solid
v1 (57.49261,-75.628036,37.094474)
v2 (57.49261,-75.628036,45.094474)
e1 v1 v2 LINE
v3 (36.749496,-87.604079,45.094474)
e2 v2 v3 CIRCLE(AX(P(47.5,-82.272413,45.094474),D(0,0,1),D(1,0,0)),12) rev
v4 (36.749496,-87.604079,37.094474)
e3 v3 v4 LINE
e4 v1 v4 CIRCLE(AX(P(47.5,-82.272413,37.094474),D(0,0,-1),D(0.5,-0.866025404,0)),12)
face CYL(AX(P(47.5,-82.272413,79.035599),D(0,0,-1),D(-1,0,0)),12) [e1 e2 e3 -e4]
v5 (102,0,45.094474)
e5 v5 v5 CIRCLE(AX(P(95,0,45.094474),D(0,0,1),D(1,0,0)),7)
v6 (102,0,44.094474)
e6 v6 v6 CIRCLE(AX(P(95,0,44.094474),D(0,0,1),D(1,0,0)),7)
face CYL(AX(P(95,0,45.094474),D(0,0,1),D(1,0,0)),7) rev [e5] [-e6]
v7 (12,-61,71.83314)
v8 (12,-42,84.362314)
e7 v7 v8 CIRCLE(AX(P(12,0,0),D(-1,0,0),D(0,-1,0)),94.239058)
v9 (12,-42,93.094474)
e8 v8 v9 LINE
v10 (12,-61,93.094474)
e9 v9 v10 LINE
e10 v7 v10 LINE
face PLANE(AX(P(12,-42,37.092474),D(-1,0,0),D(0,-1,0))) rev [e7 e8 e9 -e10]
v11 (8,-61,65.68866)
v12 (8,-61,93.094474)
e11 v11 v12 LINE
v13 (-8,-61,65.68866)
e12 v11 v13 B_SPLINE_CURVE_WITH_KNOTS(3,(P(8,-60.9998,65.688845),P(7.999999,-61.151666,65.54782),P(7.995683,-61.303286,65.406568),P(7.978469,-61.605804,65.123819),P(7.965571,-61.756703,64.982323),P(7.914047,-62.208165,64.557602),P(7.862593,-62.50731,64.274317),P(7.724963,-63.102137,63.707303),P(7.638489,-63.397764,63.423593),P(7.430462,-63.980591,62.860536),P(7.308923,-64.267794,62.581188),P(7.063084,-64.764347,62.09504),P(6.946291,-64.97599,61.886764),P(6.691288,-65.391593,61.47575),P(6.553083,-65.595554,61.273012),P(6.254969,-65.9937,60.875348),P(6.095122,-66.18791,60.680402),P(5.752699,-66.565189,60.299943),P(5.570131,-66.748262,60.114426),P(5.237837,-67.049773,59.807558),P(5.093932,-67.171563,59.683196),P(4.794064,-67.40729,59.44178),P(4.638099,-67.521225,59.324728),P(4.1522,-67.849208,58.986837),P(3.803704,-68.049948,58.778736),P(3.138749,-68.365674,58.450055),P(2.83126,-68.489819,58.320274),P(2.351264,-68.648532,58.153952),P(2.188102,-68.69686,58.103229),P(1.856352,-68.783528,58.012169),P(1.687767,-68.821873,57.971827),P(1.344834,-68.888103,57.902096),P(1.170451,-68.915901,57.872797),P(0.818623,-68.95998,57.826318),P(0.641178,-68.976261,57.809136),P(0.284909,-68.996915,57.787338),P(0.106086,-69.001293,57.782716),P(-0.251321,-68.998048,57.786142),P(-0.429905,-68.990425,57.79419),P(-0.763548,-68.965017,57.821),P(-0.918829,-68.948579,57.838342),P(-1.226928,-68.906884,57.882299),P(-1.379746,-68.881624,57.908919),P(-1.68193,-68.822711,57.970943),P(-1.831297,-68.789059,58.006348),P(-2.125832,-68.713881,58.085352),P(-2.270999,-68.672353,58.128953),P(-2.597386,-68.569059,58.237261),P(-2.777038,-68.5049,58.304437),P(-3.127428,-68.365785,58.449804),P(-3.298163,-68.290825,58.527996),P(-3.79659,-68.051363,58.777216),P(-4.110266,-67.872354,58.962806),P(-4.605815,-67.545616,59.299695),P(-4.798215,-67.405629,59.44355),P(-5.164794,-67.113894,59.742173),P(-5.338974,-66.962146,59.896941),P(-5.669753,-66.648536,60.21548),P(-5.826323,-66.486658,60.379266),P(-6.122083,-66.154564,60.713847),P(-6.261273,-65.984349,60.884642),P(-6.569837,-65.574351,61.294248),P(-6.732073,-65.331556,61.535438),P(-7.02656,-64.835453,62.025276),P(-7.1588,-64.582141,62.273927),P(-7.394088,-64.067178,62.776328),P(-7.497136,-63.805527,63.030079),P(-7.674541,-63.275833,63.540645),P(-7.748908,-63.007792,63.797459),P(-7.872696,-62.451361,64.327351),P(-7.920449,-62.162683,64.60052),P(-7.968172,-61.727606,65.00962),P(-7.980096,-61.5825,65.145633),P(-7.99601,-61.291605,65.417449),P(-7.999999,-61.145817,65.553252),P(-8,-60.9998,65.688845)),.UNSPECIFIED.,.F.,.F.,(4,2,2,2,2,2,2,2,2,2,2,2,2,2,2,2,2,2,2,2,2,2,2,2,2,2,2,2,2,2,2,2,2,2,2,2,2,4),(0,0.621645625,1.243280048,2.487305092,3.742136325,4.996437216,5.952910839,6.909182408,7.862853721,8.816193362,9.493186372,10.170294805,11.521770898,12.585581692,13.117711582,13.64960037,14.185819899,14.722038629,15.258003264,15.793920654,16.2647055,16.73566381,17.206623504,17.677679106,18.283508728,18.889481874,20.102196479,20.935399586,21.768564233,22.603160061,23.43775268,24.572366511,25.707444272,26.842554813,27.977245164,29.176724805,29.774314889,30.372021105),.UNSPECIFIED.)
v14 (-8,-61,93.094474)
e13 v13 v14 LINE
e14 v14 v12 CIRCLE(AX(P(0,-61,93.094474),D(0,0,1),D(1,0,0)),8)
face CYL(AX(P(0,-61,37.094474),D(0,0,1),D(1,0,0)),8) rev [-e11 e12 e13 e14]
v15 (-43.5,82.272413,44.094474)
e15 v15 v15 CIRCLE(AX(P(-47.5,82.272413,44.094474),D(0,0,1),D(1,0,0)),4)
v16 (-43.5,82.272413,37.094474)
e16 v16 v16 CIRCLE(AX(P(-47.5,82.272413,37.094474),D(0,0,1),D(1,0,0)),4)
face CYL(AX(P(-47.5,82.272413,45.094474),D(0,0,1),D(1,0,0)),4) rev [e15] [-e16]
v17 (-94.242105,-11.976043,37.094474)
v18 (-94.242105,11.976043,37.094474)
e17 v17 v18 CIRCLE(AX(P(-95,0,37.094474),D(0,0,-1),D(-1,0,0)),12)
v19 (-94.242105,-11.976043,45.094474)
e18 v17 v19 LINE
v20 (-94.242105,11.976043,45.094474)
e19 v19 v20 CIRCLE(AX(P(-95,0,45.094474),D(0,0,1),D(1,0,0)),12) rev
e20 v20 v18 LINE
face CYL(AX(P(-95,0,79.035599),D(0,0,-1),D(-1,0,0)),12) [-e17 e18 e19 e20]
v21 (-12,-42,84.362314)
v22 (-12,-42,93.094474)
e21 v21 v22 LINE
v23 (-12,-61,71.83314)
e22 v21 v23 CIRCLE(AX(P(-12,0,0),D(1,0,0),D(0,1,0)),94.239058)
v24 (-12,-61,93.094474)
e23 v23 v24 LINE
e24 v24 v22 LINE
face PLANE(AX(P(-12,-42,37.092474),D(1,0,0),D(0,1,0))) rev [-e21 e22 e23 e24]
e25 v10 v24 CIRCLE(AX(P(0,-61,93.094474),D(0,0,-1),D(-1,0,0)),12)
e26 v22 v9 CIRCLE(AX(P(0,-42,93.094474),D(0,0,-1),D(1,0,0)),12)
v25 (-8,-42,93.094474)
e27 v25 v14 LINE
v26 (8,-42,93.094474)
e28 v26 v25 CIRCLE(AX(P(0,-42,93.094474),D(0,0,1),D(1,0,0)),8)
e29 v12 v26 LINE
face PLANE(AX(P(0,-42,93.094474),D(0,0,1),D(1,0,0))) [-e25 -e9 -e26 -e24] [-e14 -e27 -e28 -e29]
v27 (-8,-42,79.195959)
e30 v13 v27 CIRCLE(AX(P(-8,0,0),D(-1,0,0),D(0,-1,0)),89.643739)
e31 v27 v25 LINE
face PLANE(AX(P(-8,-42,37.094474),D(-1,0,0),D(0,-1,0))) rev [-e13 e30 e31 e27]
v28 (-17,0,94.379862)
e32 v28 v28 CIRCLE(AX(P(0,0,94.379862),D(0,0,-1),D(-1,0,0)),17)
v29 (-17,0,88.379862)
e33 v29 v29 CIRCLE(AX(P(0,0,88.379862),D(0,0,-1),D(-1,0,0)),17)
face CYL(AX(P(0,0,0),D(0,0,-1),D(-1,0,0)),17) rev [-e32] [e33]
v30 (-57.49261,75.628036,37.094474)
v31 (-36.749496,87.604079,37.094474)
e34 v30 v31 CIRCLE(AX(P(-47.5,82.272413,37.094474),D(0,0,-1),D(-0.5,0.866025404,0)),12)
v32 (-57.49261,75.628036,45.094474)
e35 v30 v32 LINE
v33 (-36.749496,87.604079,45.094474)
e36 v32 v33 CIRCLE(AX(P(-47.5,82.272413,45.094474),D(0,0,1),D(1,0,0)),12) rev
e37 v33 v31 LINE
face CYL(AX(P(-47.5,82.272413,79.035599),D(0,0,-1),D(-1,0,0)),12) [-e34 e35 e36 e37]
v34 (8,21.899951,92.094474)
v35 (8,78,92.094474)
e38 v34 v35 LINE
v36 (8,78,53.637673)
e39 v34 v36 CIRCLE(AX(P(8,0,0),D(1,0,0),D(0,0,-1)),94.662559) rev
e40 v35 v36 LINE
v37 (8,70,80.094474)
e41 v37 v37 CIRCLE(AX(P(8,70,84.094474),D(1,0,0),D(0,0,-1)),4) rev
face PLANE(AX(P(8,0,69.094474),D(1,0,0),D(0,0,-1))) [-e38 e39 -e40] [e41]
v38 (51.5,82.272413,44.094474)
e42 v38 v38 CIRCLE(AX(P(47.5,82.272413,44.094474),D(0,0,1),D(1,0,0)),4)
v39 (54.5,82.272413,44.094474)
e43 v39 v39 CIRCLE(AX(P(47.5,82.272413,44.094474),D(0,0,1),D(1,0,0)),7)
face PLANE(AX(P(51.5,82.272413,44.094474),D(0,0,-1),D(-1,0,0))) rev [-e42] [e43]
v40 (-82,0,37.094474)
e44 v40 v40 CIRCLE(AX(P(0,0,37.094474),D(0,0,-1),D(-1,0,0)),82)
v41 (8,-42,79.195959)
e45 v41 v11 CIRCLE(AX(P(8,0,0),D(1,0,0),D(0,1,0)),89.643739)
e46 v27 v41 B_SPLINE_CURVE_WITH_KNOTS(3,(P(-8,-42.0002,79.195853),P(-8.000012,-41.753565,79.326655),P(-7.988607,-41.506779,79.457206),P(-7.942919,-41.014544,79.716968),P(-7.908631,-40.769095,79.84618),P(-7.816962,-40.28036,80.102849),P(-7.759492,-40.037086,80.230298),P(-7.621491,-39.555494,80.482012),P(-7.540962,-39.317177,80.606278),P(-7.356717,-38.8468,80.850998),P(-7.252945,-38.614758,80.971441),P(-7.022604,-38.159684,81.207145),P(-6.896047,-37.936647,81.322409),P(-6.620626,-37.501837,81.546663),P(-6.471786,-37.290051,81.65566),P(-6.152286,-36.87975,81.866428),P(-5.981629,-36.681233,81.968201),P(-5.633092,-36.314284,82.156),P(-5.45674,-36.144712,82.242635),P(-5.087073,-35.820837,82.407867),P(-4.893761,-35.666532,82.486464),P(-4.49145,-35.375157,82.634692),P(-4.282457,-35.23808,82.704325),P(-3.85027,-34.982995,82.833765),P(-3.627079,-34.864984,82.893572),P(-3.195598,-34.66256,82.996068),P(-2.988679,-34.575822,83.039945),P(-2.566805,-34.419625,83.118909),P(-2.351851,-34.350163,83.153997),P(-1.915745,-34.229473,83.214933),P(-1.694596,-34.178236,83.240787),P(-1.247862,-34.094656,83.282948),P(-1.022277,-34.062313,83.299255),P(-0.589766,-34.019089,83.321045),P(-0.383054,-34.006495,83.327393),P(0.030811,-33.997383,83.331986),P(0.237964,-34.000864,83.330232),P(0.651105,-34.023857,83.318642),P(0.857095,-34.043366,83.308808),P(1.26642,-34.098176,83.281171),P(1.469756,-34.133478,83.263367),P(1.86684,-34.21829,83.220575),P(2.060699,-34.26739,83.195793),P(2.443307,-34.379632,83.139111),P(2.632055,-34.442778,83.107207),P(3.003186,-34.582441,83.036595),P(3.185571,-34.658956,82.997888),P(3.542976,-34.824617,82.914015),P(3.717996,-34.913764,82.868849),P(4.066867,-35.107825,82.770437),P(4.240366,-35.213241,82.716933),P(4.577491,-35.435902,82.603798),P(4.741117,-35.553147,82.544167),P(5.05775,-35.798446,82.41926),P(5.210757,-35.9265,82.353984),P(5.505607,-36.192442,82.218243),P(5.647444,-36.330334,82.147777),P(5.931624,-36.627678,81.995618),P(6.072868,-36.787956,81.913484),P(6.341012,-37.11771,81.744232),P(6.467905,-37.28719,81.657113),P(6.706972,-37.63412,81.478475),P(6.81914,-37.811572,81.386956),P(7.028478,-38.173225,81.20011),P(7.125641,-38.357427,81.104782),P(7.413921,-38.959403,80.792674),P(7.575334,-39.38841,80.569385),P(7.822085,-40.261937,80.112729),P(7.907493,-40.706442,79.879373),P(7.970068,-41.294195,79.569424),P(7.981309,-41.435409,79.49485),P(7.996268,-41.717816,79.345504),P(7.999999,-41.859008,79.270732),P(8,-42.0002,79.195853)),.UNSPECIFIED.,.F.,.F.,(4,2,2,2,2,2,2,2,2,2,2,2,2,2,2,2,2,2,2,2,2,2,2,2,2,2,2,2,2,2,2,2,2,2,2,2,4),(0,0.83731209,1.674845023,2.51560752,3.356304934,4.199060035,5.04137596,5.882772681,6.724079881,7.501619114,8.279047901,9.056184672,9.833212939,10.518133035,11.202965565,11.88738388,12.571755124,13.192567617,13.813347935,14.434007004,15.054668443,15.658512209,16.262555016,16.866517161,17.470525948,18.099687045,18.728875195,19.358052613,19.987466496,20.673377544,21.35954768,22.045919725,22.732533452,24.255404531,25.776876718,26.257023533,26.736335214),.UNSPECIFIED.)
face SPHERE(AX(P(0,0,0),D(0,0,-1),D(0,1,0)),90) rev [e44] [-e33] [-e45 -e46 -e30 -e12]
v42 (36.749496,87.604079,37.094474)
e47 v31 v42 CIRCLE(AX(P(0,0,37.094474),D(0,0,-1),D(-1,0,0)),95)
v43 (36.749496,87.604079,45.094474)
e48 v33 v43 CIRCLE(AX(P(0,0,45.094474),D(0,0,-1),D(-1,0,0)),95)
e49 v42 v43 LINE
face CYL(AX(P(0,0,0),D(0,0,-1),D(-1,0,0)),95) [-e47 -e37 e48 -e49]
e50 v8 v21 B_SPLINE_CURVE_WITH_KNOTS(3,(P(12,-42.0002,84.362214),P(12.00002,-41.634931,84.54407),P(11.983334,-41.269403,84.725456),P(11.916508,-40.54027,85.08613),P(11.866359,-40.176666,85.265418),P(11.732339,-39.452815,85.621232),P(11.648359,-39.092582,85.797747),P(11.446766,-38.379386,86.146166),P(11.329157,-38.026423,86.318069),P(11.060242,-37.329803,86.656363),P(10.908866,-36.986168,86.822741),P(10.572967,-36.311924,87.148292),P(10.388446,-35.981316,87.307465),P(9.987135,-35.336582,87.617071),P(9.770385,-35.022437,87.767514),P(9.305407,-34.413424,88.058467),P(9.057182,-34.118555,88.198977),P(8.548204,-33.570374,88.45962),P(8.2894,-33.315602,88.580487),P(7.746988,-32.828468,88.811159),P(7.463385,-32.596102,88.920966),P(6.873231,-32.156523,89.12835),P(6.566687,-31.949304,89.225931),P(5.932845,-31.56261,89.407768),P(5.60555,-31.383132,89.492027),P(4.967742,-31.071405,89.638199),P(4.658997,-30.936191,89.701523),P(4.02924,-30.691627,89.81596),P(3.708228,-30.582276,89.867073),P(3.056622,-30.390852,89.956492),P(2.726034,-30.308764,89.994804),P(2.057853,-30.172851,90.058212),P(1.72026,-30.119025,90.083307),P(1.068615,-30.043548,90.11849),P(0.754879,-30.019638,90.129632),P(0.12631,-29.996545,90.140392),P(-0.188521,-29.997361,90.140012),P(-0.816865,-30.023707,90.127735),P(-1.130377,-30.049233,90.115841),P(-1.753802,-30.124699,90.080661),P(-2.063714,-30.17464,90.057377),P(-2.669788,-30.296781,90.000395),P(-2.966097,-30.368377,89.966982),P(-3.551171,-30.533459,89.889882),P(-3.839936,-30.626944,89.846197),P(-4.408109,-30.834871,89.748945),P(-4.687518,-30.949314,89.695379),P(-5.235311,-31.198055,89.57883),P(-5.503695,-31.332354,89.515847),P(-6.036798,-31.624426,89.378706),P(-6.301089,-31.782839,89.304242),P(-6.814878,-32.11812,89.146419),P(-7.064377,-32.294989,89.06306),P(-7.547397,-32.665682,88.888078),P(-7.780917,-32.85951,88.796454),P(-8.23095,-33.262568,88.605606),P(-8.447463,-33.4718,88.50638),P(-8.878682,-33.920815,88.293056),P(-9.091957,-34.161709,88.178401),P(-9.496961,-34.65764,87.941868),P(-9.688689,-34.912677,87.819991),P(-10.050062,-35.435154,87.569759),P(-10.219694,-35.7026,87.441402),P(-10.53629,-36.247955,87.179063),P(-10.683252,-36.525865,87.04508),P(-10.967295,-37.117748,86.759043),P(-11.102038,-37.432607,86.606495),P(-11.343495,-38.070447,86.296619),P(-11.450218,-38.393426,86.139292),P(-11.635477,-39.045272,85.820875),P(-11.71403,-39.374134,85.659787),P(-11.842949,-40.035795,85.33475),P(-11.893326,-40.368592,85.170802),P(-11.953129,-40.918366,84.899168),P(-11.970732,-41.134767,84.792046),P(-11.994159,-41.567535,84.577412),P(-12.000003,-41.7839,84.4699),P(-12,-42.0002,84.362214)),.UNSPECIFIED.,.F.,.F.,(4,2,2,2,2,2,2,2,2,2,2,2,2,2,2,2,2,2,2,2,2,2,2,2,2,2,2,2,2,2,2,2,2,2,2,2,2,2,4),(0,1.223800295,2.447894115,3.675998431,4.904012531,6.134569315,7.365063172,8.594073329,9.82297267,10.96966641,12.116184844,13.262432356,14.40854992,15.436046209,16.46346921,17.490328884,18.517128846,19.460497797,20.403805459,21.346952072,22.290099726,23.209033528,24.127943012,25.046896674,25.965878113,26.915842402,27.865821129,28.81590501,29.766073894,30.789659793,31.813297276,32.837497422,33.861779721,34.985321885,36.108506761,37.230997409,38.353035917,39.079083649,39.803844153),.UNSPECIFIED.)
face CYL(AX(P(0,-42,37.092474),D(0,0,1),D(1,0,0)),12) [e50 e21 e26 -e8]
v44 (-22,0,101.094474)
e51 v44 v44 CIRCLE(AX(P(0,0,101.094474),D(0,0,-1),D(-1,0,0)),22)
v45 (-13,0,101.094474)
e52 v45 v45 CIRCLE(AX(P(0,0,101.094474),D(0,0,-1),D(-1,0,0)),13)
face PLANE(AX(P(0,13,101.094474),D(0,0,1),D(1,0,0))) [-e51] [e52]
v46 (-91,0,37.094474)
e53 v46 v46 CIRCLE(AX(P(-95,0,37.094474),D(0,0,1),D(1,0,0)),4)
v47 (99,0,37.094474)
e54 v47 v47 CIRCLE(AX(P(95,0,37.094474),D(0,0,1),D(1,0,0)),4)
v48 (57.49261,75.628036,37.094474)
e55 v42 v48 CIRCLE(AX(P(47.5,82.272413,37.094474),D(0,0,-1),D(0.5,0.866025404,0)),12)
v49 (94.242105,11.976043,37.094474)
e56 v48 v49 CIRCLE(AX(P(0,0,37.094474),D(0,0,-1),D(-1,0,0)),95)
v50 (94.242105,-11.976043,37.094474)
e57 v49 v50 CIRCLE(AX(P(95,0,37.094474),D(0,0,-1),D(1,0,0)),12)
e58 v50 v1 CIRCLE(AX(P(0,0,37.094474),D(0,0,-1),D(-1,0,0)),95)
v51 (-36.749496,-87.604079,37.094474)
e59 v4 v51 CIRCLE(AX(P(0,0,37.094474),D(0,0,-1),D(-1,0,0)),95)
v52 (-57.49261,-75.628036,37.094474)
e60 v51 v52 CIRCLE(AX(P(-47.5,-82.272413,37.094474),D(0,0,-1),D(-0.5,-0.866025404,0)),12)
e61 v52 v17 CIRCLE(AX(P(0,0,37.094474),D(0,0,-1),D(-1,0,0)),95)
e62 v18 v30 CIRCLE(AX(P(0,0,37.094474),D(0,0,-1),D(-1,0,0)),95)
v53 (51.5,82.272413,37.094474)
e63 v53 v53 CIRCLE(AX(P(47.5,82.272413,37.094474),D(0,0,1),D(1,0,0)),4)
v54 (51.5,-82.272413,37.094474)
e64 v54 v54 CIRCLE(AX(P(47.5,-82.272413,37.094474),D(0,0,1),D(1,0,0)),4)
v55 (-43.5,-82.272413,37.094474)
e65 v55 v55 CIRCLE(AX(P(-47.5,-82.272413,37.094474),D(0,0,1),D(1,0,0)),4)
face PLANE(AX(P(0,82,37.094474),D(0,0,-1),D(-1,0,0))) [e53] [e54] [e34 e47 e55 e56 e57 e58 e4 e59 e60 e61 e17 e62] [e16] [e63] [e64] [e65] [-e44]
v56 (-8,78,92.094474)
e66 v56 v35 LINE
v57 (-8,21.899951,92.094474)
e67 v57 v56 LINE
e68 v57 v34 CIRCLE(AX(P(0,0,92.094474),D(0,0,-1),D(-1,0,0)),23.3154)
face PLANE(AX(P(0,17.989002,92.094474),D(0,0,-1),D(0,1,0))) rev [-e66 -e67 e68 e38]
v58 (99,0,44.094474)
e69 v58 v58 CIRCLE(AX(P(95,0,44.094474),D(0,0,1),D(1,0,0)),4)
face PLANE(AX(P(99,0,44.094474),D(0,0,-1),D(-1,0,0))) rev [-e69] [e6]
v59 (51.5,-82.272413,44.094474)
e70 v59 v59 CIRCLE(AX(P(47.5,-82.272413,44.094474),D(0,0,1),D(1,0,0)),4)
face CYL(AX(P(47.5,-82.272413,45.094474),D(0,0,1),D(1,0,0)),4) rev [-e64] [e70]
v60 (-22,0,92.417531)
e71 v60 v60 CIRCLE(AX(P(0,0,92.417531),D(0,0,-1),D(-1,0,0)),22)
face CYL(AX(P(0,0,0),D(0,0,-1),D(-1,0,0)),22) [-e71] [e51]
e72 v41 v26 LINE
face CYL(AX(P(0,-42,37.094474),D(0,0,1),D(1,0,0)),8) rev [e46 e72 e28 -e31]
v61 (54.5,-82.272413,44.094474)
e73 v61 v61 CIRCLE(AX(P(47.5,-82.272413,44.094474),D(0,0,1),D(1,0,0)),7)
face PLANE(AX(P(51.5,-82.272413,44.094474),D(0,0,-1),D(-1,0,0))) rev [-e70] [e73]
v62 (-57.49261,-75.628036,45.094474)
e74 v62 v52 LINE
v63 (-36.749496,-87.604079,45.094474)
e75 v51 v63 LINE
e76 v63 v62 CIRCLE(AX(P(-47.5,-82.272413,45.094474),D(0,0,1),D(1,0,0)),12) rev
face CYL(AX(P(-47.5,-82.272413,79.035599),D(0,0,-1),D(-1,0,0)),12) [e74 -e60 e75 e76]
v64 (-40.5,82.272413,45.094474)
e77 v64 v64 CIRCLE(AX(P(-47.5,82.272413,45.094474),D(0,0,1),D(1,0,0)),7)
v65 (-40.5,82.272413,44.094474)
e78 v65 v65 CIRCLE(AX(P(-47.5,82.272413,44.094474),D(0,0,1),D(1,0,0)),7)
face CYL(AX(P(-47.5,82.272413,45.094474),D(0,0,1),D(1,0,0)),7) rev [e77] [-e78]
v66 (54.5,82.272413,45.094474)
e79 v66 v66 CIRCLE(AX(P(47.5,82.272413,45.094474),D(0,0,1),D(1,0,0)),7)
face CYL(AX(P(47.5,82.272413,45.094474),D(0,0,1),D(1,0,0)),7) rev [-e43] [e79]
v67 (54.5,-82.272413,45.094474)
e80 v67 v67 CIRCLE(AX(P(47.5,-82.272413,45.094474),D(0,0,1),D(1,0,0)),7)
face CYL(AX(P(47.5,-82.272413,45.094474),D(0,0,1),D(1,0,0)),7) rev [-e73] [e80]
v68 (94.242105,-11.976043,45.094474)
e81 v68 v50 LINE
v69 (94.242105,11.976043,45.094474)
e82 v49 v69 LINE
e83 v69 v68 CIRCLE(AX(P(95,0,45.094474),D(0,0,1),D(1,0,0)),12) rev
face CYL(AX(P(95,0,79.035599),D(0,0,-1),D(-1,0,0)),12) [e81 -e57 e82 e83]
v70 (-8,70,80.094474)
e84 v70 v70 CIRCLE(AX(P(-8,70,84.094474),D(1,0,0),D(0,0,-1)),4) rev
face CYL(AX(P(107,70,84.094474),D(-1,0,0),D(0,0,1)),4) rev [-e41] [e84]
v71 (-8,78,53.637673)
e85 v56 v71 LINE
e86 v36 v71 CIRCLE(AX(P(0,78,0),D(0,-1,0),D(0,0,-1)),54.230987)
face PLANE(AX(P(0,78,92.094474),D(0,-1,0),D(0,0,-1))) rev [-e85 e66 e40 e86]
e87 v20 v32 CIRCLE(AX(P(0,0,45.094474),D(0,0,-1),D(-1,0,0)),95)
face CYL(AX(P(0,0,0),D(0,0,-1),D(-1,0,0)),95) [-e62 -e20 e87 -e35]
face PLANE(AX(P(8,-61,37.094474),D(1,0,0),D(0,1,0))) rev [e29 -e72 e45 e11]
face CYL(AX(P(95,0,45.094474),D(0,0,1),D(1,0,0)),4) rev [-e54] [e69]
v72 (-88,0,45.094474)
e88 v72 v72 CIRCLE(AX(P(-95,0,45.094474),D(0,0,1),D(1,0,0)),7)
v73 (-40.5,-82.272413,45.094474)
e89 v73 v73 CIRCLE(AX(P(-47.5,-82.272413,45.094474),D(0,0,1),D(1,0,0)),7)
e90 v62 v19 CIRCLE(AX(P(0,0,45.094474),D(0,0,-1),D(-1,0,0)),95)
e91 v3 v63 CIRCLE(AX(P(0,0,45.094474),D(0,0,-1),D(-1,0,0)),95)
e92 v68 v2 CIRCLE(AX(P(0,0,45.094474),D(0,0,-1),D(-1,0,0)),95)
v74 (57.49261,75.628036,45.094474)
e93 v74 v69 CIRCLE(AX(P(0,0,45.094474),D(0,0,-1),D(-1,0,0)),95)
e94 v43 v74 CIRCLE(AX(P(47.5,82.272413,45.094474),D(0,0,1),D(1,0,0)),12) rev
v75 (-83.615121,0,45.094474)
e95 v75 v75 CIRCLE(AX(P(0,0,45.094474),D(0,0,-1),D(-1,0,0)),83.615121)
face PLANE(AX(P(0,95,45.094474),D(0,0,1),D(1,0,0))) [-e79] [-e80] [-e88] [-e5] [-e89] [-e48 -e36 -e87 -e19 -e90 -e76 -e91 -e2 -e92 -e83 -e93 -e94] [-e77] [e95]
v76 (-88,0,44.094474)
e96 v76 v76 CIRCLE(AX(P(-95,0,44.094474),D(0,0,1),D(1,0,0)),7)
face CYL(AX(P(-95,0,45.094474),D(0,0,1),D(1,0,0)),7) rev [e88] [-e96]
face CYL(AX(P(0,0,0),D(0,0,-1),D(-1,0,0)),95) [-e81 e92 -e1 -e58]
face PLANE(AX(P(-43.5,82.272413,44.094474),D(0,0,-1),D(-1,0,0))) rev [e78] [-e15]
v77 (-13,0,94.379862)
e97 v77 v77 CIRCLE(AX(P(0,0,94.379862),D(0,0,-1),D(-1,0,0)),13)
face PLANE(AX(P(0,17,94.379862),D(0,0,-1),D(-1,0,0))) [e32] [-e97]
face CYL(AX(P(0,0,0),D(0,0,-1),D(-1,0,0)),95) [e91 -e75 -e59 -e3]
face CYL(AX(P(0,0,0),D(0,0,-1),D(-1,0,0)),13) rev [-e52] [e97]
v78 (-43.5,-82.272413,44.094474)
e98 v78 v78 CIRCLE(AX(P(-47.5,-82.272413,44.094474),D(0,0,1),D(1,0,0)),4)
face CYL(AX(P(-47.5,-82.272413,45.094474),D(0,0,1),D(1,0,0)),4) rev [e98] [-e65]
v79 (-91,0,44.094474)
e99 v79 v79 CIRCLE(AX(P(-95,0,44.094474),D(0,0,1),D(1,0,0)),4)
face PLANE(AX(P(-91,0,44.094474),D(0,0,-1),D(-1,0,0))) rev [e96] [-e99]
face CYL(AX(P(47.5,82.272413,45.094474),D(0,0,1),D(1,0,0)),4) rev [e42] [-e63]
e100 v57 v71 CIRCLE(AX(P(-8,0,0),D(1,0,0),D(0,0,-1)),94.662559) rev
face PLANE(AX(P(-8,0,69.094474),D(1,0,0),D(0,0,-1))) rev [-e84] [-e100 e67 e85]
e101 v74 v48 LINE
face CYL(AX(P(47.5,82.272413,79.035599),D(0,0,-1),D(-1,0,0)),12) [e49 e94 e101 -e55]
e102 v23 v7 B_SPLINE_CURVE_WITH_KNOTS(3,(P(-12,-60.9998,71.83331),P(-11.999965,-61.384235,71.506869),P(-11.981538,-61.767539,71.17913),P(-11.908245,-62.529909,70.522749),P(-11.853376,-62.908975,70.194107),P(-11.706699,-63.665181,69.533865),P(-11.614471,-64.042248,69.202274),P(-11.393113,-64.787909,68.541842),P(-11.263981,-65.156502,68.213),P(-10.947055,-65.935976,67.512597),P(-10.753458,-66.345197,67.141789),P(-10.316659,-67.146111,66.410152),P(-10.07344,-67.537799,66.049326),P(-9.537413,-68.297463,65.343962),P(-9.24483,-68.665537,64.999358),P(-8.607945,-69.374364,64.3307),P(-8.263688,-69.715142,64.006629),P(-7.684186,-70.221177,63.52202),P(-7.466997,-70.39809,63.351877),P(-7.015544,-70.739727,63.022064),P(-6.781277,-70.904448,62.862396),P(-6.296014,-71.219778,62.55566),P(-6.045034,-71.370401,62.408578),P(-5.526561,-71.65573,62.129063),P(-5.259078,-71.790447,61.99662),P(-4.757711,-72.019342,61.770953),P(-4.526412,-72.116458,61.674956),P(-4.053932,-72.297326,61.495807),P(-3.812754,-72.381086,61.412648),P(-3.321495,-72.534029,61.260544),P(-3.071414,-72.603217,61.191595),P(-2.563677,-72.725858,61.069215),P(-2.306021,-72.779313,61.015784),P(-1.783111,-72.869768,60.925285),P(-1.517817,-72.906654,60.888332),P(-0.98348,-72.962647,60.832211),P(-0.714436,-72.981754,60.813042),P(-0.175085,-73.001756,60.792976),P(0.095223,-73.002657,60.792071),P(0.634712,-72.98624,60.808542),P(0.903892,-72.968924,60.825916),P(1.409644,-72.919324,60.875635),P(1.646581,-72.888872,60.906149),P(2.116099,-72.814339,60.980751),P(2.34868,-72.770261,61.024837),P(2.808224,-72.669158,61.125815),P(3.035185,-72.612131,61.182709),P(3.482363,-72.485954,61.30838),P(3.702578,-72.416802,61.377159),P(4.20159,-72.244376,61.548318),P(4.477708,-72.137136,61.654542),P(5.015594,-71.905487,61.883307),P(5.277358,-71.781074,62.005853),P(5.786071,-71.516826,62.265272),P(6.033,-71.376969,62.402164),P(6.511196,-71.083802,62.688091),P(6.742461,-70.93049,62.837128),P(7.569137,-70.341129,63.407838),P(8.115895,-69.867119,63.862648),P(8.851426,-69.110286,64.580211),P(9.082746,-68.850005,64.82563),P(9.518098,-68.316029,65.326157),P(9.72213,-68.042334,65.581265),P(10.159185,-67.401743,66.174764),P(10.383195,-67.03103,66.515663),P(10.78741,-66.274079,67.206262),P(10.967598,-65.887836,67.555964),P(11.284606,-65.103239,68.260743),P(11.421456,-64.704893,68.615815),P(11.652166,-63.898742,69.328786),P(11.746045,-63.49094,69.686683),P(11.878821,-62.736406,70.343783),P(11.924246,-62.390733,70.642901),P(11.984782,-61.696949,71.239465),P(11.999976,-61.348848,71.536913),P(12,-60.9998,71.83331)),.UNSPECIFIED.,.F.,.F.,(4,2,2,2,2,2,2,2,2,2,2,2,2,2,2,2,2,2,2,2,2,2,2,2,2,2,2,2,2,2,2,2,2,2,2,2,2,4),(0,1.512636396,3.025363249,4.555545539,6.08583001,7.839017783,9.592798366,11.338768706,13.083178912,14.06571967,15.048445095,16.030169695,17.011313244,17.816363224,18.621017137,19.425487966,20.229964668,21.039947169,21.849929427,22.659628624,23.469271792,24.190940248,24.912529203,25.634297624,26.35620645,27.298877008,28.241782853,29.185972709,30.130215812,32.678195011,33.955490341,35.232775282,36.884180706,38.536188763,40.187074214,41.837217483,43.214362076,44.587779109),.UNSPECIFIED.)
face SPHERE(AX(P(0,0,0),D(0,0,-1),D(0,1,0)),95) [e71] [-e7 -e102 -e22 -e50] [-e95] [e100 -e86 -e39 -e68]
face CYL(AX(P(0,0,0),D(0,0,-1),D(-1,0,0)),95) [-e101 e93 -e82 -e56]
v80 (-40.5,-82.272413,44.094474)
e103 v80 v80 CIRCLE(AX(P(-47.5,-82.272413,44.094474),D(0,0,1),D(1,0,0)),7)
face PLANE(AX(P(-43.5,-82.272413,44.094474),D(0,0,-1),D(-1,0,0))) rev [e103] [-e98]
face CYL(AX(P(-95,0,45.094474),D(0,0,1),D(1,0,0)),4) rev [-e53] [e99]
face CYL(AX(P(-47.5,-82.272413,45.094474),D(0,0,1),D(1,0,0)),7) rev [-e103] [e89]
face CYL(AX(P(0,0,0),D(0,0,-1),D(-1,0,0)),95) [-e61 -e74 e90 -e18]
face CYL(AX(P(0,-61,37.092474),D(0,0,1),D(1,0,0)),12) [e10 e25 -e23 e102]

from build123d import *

# Parameters (mm, degrees)
SKETCH_2_R                   = 12
EXTRUDE_1_DEPTH              = 8
HOLE_WIZARD_M8_3_D           = 8
HOLE_WIZARD_M8_3_CBORE_D     = 14
HOLE_WIZARD_M8_3_CBORE_DEPTH = 1
PATTERN_CIRCULAR_1_COUNT     = 6
EXTRUDE_2_REACH              = 155.655
EXTRUDE_2_END_RADIUS         = 95
CUT_EXTRUDE_1_DEPTH          = 154.655458738
RIB_START                    = -8
RIB_1_DEPTH                  = 16
CUT_EXTRUDE_3_DEPTH          = 176.197296411
CUT_EXTRUDE_3_DEPTH_BACK     = 176.197296411
SKETCH_14_R                  = 4


with BuildPart() as part:
    # 草图1 → 旋转1 (revolve)
    with BuildSketch(Plane(origin=(0, 0, 0), x_dir=(0, 0, -1), z_dir=(1, 0, 0)), mode=Mode.PRIVATE) as revolve_1_sk:
        with BuildLine():
            Line((-88.37986196, 17), (-94.37986196, 17))
            Line((-94.37986196, 17), (-94.37986196, 13))
            Line((-94.37986196, 13), (-101.094473982, 13))
            Line((-101.094473982, 13), (-101.094473982, 22))
            Line((-101.094473982, 22), (-92.417530804, 22))
            ThreePointArc((-92.417530804, 22), (-75.342508858, 57.866279982), (-45.094473982, 83.61512074))
            Line((-45.094473982, 83.61512074), (-45.094473982, 95))
            Line((-45.094473982, 95), (-37.094473982, 95))
            Line((-37.094473982, 95), (-37.094473982, 82))
            ThreePointArc((-37.094473982, 82), (-70.65551815, 55.747625555), (-88.37986196, 17))
        make_face()
    revolve(revolve_1_sk.sketch.rotate(Axis((0, 0, 0), (0, 0, 1)), 90), axis=Axis((0, 0, 0), (0, 0, 1)))

    # 草图2 → 凸台-拉伸1 (add)
    with BuildSketch(Plane(origin=(0, 0, 37.094473982), x_dir=(-1, 0, 0), z_dir=(0, 0, -1))):
        with Locations((95, 0)):
            Circle(SKETCH_2_R)
    extrude_1 = extrude(amount=-EXTRUDE_1_DEPTH)

    # M8 六角头螺栓的柱形沉头孔3 (through all)
    with Locations(Plane.XY.offset(45.094473982)):
        with Locations((-95, 0)):
            hole_wizard_m8_3 = CounterBoreHole(HOLE_WIZARD_M8_3_D / 2, HOLE_WIZARD_M8_3_CBORE_D / 2, HOLE_WIZARD_M8_3_CBORE_DEPTH)

    # 阵列(圆周)1: 凸台-拉伸1, M8 六角头螺栓的柱形沉头孔3 ×6 about axis
    pattern_circular_1_axis = Axis((0, 0, 0), (0, 0, 1))
    add([extrude_1.rotate(pattern_circular_1_axis, i * 360 / PATTERN_CIRCULAR_1_COUNT) for i in range(1, PATTERN_CIRCULAR_1_COUNT)])
    add([hole_wizard_m8_3.rotate(pattern_circular_1_axis, i * 360 / PATTERN_CIRCULAR_1_COUNT) for i in range(1, PATTERN_CIRCULAR_1_COUNT)], mode=Mode.SUBTRACT)

    # 凸台-拉伸2: up to this sphere (the profile starts outside it)
    extrude_2_end = Location((0, 0, 0)) * Sphere(EXTRUDE_2_END_RADIUS, mode=Mode.PRIVATE)
    # 草图9 → 凸台-拉伸2 (add, up to the surface)
    with BuildSketch(Plane(origin=(0, 0, 93.094473982), x_dir=(-1, 0, 0), z_dir=(0, 0, -1)), mode=Mode.PRIVATE) as extrude_2_sk1:
        with BuildLine():
            Line((-12, -42), (-12, -61))
            ThreePointArc((-12, -61), (0, -73), (12, -61))
            Line((12, -61), (12, -42))
            ThreePointArc((12, -42), (0, -30), (-12, -42))
        make_face()
    extrude_2_tool1 = extrude(extrude_2_sk1.sketch, amount=EXTRUDE_2_REACH, mode=Mode.PRIVATE) - extrude_2_end
    add(extrude_2_tool1.solids().sort_by_distance((0, -51.5, 93.094474))[0])

    # 草图10 → 切除-拉伸1 (cut, through all)
    with BuildSketch(Plane.XY.offset(93.094473982)):
        with BuildLine():
            Line((-8, -42), (-8, -61))
            ThreePointArc((-8, -61), (0, -69), (8, -61))
            Line((8, -61), (8, -42))
            ThreePointArc((8, -42), (0, -34), (-8, -42))
        make_face()
    extrude(amount=-CUT_EXTRUDE_1_DEPTH, mode=Mode.SUBTRACT)

    # 筋1: read off the stored shape, not the designer's step
    # 筋1 outline → 筋1 (add)
    with BuildSketch(Plane(origin=(0, 0, 0), x_dir=(0, 0, -1), z_dir=(1, 0, 0)).offset(RIB_START)):
        with BuildLine():
            Line((-53.637673328, 78), (-92.094473982, 78))
            Line((-92.094473982, 78), (-92.094473982, 21.899951187))
            ThreePointArc((-92.094473982, 21.899951187), (-78.078605002, 53.523186012), (-53.637673328, 78))
        make_face()
    extrude(amount=RIB_1_DEPTH)

    # 草图14 → 切除-拉伸3 (cut, two sides: drawn at the far end of the back side and taken through both)
    with BuildSketch(Plane(origin=(0, 0, 0), x_dir=(0, 0, -1), z_dir=(1, 0, 0)).offset(-CUT_EXTRUDE_3_DEPTH_BACK)):
        with Locations((-84.094473982, 70)):
            Circle(SKETCH_14_R)
    extrude(amount=CUT_EXTRUDE_3_DEPTH + CUT_EXTRUDE_3_DEPTH_BACK, mode=Mode.SUBTRACT)


solid = part.part
